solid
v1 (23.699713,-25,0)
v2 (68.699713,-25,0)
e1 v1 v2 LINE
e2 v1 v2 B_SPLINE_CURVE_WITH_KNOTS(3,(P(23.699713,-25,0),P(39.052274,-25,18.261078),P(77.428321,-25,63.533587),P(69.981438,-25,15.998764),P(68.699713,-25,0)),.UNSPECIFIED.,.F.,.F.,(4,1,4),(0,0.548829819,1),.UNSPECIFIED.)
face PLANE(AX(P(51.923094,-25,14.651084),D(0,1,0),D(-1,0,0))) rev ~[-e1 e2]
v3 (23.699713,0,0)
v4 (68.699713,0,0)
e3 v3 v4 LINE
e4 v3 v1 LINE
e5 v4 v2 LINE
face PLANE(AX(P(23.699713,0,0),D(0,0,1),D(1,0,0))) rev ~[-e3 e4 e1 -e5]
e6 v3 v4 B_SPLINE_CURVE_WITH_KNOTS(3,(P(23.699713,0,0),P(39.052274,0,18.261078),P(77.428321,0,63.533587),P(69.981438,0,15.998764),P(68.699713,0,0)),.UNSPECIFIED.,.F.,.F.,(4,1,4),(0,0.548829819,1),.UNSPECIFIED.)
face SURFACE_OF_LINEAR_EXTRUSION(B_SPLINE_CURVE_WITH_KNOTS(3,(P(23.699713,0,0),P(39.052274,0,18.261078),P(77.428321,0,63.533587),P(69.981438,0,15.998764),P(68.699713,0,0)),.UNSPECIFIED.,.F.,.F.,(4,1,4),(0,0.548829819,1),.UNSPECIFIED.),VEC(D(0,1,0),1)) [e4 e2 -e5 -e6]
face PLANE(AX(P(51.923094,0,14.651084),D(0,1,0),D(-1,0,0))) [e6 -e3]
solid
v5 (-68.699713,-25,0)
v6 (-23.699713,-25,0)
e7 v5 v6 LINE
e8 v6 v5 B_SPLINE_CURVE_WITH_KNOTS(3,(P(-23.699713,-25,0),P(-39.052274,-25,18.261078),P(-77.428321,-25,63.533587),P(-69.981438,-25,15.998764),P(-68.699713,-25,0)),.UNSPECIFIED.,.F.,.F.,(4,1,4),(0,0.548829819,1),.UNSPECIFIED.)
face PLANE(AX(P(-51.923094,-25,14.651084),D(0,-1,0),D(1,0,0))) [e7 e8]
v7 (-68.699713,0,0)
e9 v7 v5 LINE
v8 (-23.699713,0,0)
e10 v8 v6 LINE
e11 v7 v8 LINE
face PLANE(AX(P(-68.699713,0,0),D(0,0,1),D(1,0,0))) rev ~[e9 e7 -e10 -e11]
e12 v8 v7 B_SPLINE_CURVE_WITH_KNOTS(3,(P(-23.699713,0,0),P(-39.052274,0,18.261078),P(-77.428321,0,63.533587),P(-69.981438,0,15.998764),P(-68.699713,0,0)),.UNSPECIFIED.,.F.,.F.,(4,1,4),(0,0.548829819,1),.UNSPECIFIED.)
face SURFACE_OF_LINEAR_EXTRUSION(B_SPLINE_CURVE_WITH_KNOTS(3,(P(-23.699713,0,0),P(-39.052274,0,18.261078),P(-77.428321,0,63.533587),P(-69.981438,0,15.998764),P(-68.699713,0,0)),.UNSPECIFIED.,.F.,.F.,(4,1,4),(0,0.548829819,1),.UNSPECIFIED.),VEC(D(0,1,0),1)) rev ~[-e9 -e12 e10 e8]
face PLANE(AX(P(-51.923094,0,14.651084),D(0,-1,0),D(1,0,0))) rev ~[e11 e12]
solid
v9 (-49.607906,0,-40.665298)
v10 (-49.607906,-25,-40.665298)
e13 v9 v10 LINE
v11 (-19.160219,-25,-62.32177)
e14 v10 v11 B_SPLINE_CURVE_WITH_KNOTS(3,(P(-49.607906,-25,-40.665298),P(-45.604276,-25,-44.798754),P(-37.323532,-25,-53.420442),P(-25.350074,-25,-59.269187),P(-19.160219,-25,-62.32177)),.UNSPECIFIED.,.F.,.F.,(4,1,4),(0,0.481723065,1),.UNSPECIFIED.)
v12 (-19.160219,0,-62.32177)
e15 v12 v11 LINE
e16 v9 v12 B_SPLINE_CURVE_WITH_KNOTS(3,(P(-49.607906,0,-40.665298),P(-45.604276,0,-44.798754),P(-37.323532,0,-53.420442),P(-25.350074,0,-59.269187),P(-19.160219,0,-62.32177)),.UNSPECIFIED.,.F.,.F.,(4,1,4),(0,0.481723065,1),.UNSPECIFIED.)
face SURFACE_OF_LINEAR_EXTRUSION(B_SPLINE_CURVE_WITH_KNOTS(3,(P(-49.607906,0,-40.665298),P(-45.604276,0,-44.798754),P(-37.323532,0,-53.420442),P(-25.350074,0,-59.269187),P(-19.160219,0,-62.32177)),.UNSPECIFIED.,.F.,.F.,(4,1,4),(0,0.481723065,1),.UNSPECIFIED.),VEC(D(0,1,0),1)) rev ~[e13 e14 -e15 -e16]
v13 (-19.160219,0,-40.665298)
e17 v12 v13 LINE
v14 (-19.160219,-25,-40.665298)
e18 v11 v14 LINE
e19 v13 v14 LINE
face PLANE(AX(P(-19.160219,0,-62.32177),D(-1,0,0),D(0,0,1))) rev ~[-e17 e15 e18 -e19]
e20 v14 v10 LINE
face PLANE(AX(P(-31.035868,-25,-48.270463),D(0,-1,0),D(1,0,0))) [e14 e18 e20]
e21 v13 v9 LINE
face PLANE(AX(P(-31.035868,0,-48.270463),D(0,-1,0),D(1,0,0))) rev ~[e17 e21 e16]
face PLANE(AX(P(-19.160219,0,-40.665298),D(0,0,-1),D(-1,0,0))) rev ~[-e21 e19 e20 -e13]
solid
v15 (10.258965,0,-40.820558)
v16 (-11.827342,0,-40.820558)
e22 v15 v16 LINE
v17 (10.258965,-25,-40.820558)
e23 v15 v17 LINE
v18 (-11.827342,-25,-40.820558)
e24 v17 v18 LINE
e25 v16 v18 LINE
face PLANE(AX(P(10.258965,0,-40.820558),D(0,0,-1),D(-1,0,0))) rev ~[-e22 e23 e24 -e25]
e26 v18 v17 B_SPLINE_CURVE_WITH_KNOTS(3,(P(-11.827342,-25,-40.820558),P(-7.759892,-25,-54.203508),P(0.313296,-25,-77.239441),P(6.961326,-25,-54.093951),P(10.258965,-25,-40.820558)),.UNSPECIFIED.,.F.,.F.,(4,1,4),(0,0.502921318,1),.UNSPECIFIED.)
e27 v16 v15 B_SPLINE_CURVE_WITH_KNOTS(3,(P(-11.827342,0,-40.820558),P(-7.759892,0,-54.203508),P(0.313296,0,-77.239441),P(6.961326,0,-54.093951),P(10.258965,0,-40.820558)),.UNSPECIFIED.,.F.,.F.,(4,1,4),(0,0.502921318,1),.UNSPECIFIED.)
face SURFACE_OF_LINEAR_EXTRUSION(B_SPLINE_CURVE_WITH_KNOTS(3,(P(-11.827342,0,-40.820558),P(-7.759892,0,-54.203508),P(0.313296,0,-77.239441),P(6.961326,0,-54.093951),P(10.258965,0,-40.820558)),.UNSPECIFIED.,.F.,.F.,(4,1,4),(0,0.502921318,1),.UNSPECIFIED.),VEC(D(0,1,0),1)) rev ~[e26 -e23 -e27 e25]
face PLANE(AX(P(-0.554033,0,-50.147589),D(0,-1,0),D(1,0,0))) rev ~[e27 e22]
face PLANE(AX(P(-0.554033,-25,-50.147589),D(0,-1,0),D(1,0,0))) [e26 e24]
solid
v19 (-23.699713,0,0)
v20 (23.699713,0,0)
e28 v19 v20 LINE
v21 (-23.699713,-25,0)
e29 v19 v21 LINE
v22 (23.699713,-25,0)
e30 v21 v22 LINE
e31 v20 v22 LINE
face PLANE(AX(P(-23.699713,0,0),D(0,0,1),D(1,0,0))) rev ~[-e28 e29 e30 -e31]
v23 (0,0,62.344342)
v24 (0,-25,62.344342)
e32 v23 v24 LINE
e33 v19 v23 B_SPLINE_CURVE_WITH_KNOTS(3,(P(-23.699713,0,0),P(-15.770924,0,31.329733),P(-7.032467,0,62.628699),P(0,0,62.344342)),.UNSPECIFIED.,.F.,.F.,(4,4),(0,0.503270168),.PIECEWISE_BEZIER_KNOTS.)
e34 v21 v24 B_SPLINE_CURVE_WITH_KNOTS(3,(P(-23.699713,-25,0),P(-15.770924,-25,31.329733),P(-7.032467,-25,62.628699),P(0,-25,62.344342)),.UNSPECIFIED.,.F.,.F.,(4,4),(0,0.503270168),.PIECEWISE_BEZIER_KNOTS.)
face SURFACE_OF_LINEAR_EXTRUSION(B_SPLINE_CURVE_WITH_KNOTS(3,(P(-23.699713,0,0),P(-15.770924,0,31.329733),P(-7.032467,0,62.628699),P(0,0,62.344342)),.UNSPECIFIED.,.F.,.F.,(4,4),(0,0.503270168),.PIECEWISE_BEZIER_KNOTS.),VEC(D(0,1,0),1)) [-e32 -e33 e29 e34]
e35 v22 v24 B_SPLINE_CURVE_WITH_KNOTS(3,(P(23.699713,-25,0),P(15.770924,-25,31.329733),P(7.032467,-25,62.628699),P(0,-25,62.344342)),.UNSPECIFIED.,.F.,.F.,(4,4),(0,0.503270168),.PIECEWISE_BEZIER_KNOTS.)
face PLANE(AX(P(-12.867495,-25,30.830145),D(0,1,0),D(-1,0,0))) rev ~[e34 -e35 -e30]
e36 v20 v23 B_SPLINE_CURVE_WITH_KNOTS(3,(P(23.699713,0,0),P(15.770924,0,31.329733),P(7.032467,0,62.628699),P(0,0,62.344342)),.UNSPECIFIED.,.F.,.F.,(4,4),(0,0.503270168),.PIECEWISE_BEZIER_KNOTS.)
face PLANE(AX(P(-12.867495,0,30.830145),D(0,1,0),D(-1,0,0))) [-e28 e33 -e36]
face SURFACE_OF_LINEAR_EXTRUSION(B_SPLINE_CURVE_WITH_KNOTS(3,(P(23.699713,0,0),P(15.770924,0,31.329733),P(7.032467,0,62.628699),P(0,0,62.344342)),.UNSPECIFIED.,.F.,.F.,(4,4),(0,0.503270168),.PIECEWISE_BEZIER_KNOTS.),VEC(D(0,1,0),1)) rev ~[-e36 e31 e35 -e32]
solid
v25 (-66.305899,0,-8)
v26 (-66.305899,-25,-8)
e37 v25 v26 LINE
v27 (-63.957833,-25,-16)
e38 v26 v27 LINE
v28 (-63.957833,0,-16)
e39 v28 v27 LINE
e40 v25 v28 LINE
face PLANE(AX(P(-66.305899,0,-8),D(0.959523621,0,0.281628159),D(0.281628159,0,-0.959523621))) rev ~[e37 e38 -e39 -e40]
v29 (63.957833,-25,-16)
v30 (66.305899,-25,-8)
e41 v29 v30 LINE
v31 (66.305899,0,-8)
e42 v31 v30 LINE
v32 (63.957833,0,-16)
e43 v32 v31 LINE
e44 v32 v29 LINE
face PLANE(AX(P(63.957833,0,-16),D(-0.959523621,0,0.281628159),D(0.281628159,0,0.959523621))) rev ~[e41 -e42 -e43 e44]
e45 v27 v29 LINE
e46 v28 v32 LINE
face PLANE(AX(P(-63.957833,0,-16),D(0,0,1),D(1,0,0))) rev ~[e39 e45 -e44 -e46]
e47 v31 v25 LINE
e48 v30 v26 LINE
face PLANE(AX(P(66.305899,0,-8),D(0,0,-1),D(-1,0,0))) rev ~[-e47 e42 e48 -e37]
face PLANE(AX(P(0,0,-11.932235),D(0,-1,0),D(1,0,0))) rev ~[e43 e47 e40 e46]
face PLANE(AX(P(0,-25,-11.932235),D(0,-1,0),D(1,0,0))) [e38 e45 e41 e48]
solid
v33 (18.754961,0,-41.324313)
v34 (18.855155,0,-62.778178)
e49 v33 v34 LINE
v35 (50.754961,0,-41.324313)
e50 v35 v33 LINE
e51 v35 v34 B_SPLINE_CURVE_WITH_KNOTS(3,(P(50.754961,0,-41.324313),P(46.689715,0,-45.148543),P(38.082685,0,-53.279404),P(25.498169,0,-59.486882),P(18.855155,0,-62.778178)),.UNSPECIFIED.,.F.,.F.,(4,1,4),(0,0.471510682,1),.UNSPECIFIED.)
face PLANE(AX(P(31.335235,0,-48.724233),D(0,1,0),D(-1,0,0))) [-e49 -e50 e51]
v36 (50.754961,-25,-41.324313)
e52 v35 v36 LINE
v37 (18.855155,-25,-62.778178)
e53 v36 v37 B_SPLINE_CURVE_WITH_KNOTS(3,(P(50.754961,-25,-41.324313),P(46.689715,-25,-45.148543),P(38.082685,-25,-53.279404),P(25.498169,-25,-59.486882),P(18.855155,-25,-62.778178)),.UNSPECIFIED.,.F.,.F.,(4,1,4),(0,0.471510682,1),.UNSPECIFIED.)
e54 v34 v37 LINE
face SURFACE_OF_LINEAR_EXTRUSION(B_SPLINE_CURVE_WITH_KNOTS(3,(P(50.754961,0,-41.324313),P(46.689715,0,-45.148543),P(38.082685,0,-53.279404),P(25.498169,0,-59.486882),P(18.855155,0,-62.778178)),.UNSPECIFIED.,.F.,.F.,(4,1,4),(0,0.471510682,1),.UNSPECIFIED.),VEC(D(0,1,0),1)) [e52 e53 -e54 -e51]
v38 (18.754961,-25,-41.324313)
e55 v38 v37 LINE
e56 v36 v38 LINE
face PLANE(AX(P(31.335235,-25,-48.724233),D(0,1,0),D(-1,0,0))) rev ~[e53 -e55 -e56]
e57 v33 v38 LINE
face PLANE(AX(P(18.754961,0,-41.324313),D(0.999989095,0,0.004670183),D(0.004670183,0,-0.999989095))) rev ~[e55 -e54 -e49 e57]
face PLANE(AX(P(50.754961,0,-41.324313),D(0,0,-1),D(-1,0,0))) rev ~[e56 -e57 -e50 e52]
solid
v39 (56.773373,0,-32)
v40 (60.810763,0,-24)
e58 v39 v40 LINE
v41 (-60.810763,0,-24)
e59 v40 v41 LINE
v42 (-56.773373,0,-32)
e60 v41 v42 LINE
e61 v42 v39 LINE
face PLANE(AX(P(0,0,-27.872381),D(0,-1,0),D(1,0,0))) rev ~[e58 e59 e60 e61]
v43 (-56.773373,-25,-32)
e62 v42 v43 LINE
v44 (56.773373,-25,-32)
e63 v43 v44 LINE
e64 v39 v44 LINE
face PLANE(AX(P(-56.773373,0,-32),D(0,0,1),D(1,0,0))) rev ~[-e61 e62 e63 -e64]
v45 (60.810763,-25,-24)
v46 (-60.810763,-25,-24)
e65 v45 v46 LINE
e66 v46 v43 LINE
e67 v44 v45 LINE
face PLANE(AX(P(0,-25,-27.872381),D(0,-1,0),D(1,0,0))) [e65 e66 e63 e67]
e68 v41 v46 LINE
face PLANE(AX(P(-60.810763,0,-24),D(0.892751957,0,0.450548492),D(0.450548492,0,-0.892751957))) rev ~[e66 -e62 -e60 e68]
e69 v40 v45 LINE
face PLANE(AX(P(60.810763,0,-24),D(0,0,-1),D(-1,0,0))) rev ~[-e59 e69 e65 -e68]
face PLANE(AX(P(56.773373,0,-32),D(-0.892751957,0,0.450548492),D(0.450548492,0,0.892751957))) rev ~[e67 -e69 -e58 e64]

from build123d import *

# Parameters (mm, degrees)
F1_DEPTH = 25


with BuildPart() as f1:
    # F0 (on Front) → F1 (new body)
    with BuildSketch(Plane.XZ):
        with BuildLine():
            Line((-68.6997125745, 0), (-23.6997125745, 0))
            add(Edge.make_bspline(
                [(-23.6997125745, 0), (-39.0522736523, 18.2610777884), (-77.4283213345, 63.5335866827), (-69.9814380991, 15.9987635125), (-68.6997125745, 0)],
                knots=[0, 0, 0, 0, 0.5488298185, 1, 1, 1, 1], degree=3))
        make_face()
    extrude(amount=F1_DEPTH)


with BuildPart() as f1b:
    # F0 (on Front) → F1, piece 2 (new body)
    with BuildSketch(Plane.XZ):
        with BuildLine():
            add(Edge.make_bspline(
                [(-23.6997125745, 0), (-15.7709243038, 31.3297332335), (-7.0324667798, 62.6286994315), (-1.17e-08, 62.3443424706)],
                knots=[0, 0, 0, 0, 0.5032701678, 0.5032701678, 0.5032701678, 0.5032701678], degree=3))
            Line((-23.6997125745, 0), (-18.3002874255, 0))
            add(Edge.make_bspline(
                [(-1.17e-08, 62.3443424697), (-6.9410751237, 62.0636808676), (-12.2202123623, 31.0152552891), (-18.3002874255, 0)],
                knots=[0.5032701678, 0.5032701678, 0.5032701678, 0.5032701678, 1, 1, 1, 1], degree=3))
        make_face()
        with BuildLine():
            add(Edge.make_bspline(
                [(-1.17e-08, 62.3443424697), (-6.9410751237, 62.0636808676), (-12.2202123623, 31.0152552891), (-18.3002874255, 0)],
                knots=[0.5032701678, 0.5032701678, 0.5032701678, 0.5032701678, 1, 1, 1, 1], degree=3))
            Line((-18.3002874255, 0), (0, 0))
            Line((0, 0), (18.3002874255, 0))
            add(Edge.make_bspline(
                [(-1.17e-08, 62.3443424706), (6.9410751148, 62.06368092), (12.2202123623, 31.0152552891), (18.3002874255, 0)],
                knots=[0.5032701678, 0.5032701678, 0.5032701678, 0.5032701678, 1, 1, 1, 1], degree=3))
        make_face()
        with BuildLine():
            add(Edge.make_bspline(
                [(23.6997125745, 0), (15.7709243038, 31.3297332335), (7.0324667652, 62.6286994836), (-1.17e-08, 62.3443424697)],
                knots=[0, 0, 0, 0, 0.5032701678, 0.5032701678, 0.5032701678, 0.5032701678], degree=3))
            add(Edge.make_bspline(
                [(-1.17e-08, 62.3443424706), (6.9410751148, 62.06368092), (12.2202123623, 31.0152552891), (18.3002874255, 0)],
                knots=[0.5032701678, 0.5032701678, 0.5032701678, 0.5032701678, 1, 1, 1, 1], degree=3))
            Line((18.3002874255, 0), (23.6997125745, 0))
        make_face()
    extrude(amount=F1_DEPTH)


with BuildPart() as f1c:
    # F0 (on Front) → F1, piece 3 (new body)
    with BuildSketch(Plane.XZ):
        with BuildLine():
            add(Edge.make_bspline(
                [(23.6997125745, 0), (39.0522736523, 18.2610777884), (77.4283213345, 63.5335866827), (69.9814380991, 15.9987635125), (68.6997125745, 0)],
                knots=[0, 0, 0, 0, 0.5488298185, 1, 1, 1, 1], degree=3))
            Line((23.6997125745, 0), (68.6997125745, 0))
        make_face()
    extrude(amount=F1_DEPTH)


with BuildPart() as f1d:
    # F0 (on Front) → F1, piece 4 (new body)
    with BuildSketch(Plane.XZ):
        Polygon((0, -8), (-66.3058993968, -8), (-63.9578328955, -16), (0, -16), (63.9578328955, -16), (66.3058993968, -8), align=None)
    extrude(amount=F1_DEPTH)


with BuildPart() as f1e:
    # F0 (on Front) → F1, piece 5 (new body)
    with BuildSketch(Plane.XZ):
        Polygon((0, -24), (-60.8107628588, -24), (-56.7733727334, -32), (0, -32), (56.7733727334, -32), (60.8107628588, -24), align=None)
    extrude(amount=F1_DEPTH)


with BuildPart() as f1f:
    # F0 (on Front) → F1, piece 6 (new body)
    with BuildSketch(Plane.XZ):
        with BuildLine():
            Line((-19.1602188304, -40.6652976506), (-49.6079055849, -40.6652976506))
            add(Edge.make_bspline(
                [(-49.6079055849, -40.6652976506), (-45.6042762075, -44.7987540399), (-37.323531991, -53.42044232), (-25.350073964, -59.2691873867), (-19.1602188304, -62.3217699111)],
                knots=[0, 0, 0, 0, 0.4817230649, 1, 1, 1, 1], degree=3))
            Line((-19.1602188304, -62.3217699111), (-19.1602188304, -40.6652976506))
        make_face()
    extrude(amount=F1_DEPTH)


with BuildPart() as f1g:
    # F0 (on Front) → F1, piece 7 (new body)
    with BuildSketch(Plane.XZ):
        with BuildLine():
            add(Edge.make_bspline(
                [(50.7549608034, -41.3243134417), (46.6897149867, -45.1485426126), (38.0826848799, -53.2794044405), (25.4981687947, -59.4868820492), (18.8551553599, -62.7781776149)],
                knots=[0, 0, 0, 0, 0.471510682, 1, 1, 1, 1], degree=3))
            Line((50.7549608034, -41.3243134417), (18.7549608034, -41.3243134417))
            Line((18.7549608034, -41.3243134417), (18.8551553599, -62.7781776149))
        make_face()
    extrude(amount=F1_DEPTH)


with BuildPart() as f1h:
    # F0 (on Front) → F1, piece 8 (new body)
    with BuildSketch(Plane.XZ):
        with BuildLine():
            Line((10.2589651942, -40.8205576241), (-11.8273422122, -40.8205576241))
            add(Edge.make_bspline(
                [(-11.8273422122, -40.8205576241), (-7.7598916227, -54.2035082505), (0.3132963291, -77.2394406177), (6.9613261908, -54.0939511769), (10.2589651942, -40.8205576241)],
                knots=[0, 0, 0, 0, 0.5029213178, 1, 1, 1, 1], degree=3))
        make_face()
    extrude(amount=F1_DEPTH)


solid = Compound([f1.part, f1b.part, f1c.part, f1d.part, f1e.part, f1f.part, f1g.part, f1h.part])
